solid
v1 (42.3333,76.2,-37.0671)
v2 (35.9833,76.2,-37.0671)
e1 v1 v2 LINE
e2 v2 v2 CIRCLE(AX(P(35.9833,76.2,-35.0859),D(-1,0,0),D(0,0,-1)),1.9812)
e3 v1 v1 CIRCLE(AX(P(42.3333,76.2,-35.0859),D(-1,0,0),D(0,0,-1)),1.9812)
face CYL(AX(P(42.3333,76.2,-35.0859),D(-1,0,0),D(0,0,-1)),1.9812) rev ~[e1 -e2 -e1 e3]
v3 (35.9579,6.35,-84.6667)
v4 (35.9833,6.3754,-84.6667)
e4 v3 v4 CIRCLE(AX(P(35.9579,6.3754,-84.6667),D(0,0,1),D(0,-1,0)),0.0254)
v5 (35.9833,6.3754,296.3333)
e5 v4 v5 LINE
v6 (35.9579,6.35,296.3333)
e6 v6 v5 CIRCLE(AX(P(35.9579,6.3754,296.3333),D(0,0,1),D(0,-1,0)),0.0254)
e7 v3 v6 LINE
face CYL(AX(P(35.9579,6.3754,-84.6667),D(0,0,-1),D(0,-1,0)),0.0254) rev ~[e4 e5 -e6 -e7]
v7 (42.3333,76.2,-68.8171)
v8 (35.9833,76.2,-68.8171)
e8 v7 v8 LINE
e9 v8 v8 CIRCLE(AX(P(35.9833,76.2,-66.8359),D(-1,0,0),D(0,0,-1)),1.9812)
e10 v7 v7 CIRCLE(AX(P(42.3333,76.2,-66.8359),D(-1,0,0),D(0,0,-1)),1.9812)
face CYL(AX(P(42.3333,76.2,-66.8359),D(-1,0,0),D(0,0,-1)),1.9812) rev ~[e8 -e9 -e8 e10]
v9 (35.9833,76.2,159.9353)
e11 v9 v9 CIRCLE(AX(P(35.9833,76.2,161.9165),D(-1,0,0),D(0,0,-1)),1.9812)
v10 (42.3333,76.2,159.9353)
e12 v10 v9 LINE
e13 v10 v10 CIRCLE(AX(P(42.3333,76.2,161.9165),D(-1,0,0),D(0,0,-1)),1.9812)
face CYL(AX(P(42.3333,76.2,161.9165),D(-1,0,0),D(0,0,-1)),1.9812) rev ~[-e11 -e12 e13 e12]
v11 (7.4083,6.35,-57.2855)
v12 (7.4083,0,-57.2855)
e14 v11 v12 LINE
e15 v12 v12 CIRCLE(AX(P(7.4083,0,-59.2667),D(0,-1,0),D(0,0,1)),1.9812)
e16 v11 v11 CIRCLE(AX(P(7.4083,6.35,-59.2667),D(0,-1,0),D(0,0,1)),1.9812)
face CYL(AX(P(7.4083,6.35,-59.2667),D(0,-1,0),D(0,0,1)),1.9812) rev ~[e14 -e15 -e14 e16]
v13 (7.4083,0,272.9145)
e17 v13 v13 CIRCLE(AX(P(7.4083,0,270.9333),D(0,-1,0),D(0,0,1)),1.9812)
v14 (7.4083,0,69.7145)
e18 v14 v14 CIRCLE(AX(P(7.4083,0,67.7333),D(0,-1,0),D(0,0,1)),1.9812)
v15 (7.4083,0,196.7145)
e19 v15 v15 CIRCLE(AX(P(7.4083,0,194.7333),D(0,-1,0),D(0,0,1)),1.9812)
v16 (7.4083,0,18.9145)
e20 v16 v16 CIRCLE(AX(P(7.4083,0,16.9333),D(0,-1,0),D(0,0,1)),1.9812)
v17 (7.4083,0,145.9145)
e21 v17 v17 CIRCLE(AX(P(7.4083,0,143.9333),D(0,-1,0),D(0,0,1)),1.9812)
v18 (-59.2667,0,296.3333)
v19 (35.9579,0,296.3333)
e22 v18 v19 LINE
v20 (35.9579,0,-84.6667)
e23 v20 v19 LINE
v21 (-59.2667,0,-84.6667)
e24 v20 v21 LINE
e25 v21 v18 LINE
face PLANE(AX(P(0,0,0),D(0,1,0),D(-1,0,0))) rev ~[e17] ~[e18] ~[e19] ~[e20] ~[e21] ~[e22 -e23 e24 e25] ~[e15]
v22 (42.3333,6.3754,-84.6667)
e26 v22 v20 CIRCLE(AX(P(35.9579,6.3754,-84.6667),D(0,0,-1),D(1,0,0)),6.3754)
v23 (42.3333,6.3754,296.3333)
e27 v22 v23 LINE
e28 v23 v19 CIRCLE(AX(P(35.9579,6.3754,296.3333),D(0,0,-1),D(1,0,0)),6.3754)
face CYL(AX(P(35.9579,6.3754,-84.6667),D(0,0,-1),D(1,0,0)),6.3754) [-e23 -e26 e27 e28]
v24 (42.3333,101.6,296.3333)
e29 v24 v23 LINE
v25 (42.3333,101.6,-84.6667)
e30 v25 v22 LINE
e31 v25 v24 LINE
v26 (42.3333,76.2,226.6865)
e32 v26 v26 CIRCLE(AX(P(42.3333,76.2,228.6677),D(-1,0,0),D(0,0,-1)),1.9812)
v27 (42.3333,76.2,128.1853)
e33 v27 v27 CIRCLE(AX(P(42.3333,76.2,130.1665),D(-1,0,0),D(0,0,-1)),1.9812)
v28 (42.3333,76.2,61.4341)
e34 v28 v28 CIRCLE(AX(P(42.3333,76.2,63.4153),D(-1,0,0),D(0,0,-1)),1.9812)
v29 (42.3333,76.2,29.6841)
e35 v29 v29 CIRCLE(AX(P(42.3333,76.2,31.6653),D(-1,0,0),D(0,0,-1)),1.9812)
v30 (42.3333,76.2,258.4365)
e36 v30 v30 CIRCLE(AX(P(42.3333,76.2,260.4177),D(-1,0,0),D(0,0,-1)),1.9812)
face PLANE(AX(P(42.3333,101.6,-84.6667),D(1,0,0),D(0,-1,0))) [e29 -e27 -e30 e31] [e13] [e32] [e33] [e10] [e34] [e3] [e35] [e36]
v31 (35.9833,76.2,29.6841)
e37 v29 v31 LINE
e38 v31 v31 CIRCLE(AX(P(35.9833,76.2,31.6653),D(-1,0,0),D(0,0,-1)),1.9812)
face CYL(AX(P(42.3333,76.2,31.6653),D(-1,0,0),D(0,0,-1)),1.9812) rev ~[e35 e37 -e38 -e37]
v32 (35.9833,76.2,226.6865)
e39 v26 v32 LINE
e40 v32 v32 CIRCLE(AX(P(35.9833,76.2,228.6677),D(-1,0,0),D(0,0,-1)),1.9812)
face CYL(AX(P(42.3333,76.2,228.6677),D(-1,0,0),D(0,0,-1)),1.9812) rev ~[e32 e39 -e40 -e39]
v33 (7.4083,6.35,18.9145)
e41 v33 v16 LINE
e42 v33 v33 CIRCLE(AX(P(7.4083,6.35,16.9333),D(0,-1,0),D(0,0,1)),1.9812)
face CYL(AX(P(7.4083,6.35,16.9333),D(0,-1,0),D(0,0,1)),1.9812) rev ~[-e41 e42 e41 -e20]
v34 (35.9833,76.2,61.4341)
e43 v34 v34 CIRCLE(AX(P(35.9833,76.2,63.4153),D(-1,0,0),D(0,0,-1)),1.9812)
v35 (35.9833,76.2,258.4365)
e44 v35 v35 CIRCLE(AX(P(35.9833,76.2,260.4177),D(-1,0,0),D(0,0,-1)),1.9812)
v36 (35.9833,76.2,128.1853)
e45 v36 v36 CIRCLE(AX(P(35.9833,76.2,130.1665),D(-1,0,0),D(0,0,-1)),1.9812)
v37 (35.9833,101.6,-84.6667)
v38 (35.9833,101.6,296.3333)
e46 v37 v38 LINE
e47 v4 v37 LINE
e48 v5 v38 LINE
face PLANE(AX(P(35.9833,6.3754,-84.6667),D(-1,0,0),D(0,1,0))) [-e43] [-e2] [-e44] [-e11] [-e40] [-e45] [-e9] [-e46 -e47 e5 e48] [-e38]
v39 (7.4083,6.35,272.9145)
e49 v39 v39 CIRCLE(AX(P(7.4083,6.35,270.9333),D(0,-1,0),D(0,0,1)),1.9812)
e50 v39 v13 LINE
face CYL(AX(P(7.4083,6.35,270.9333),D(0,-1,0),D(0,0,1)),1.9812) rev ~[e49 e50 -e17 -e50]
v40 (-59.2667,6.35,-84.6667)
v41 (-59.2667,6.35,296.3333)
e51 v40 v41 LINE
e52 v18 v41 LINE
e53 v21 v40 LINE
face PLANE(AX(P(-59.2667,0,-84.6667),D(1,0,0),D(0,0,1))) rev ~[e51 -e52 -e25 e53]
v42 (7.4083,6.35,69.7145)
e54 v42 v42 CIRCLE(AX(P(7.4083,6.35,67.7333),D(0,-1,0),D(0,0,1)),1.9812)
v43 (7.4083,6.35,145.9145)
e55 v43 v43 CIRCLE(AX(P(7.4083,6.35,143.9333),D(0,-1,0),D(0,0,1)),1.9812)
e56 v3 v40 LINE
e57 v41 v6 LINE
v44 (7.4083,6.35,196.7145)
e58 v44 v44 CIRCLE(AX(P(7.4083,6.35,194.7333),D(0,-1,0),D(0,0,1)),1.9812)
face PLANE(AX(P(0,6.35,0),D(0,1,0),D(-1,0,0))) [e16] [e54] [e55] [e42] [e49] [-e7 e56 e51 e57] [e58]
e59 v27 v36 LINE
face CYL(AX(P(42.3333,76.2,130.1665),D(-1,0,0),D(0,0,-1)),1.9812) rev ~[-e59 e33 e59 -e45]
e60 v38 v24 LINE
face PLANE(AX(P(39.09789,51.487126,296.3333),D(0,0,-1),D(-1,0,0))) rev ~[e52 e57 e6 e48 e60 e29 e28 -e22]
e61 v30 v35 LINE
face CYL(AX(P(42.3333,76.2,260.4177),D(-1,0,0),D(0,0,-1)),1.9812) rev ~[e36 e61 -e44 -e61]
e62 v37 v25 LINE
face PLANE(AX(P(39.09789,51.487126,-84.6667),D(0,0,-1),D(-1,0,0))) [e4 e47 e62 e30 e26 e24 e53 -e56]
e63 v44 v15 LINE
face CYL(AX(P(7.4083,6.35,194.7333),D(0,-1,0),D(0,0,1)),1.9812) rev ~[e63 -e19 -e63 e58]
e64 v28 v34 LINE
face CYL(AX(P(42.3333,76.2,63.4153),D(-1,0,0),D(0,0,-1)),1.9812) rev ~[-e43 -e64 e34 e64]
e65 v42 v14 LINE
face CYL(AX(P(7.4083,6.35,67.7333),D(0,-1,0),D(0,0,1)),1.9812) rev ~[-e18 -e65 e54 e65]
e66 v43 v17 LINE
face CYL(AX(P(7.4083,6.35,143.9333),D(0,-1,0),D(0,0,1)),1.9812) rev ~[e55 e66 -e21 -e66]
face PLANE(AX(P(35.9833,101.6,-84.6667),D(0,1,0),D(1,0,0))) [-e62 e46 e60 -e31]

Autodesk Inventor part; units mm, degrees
ref_plane "YZ Plane" through (0, 0, 0) normal (1, 0, 0) x (0, 1, 0)
ref_plane "XZ Plane" through (0, 0, 0) normal (0, 1, 0) x (-1, 0, 0)
ref_plane "XY Plane" through (0, 0, 0) normal (0, 0, 1) x (1, 0, 0)
sketch "Sketch1" plane through (0, 0, 0) normal (0, 1, 0) x (-1, 0, 0)
  line L0 (59.2667, 296.3333) -> (-42.3333, 296.3333)
  line L1 (-42.3333, 296.3333) -> (-42.3333, -84.6667)
  line L2 (-42.3333, -84.6667) -> (59.2667, -84.6667)
  line L3 (59.2667, -84.6667) -> (59.2667, 296.3333)
  point P0 (0, 0)
  dimension "d0" = 101.6
  dimension "d1" = 381
extrude "Plate1" add sketch "Sketch1" along normal blind 6.35
sketch "Sketch2" plane through (35.9833, 0, -84.6667) normal (1, 0, 0) x (0, 1, 0)
  line L0 (0, 381) -> (0, 0)
  line L1 (0, 0) -> (101.6, 0)
  line L2 (101.6, 0) -> (101.6, 381)
  line L3 (101.6, 381) -> (0, 381)
edge flange "Flange1" height 101.6 angle 90 thickness 6.35 bend radius 0.0254 thickness toward (1, 0, 0) relief straight relief width 6.35 relief depth 3.175 edges at (42.3333, 6.35, 105.8333) wall of the first edge with corners at (35.9833, 0, 296.3333) (35.9833, 0, -84.6667) (35.9833, 101.6, -84.6667) (35.9833, 101.6, 296.3333)
bend "Bend1"
corner "Corner1"
sketch "Sketch3" plane through (42.3333, 101.6, 296.3333) normal (1, 0, 0) x (0, 0, -1)
  line L0 (20.0406, 0) -> (378.4346, 0) construction
  line L1 (378.4346, 0) -> (378.4346, -101.6) construction
  line L2 (378.4346, -101.6) -> (20.0406, -101.6) construction
  line L3 (20.0406, -101.6) -> (20.0406, 0) construction
  line L4 (0, -95.2246) -> (0, 0) construction
  line L5 (0, 0) -> (381, 0) construction
  line L6 (20.0406, 0) -> (83.5406, 0) construction
  line L7 (83.5406, 0) -> (83.5406, -95.25) construction
  line L8 (83.5406, -95.25) -> (20.0406, -95.25) construction
  line L9 (20.0406, -95.25) -> (20.0406, 0) construction
  line L10 (118.3386, 0) -> (181.8386, 0) construction
  line L11 (181.8386, 0) -> (181.8386, -95.25) construction
  line L12 (181.8386, -95.25) -> (118.3386, -95.25) construction
  line L13 (118.3386, -95.25) -> (118.3386, 0) construction
  line L14 (216.6366, 0) -> (280.1366, 0) construction
  line L15 (280.1366, 0) -> (280.1366, -95.25) construction
  line L16 (280.1366, -95.25) -> (216.6366, -95.25) construction
  line L17 (216.6366, -95.25) -> (216.6366, 0) construction
  line L18 (314.9346, 0) -> (378.4346, 0) construction
  line L19 (378.4346, 0) -> (378.4346, -95.25) construction
  line L20 (378.4346, -95.25) -> (314.9346, -95.25) construction
  line L21 (314.9346, -95.25) -> (314.9346, 0) construction
  line L22 (35.9156, -25.4) -> (67.6656, -25.4) construction
  line L23 (134.4168, -25.4) -> (166.1668, -25.4) construction
  line L24 (232.918, -25.4) -> (264.668, -25.4) construction
  line L25 (331.4192, -25.4) -> (363.1692, -25.4) construction
  point P0 (296.3333, -101.6)
  dimension "d13" = 358.394
  dimension "d14" = 20.0406
  dimension "d15" = 101.6
  dimension "d16" = 0
  dimension "d17" = 63.5
  dimension "d18" = 63.5
  dimension "d19" = 34.798
  dimension "d20" = 63.5
  dimension "d21" = 34.798
  dimension "d22" = 63.5
  dimension "d23" = 34.798
  dimension "d24" = 25.4
  dimension "d25" = 31.75
  dimension "d26" = 15.875
  dimension "d36" = 98.5012
hole "Hole1" at (42.3333, 76.2, 260.4177) at (42.3333, 76.2, 228.6677) at (42.3333, 76.2, 130.1665) at (42.3333, 76.2, 161.9165) at (42.3333, 76.2, 63.4153) at (42.3333, 76.2, 31.6653) at (42.3333, 76.2, -35.0859) at (42.3333, 76.2, -66.8359) direction (-1, 0, 0) diameter 3.9624 depth 13.6144 tip angle 118 thread size "10-32 UNF" class "2B" standard "ANSI Unified Screw Threads"
sketch "Sketch4" plane through (0, 6.35, 0) normal (0, 1, 0) x (1, 0, 0)
  line L0 (-59.2667, -296.3333) -> (-59.2667, 84.6667) projected
  line L1 (-59.2667, 84.6667) -> (35.9579, 84.6667) projected
  line L2 (42.3333, -296.3333) -> (42.3333, 84.6667) projected
  line L3 (35.9579, -296.3333) -> (-59.2667, -296.3333) projected
  point P0 (7.4083, 59.2667)
  point P1 (7.4083, -16.9333)
  point P2 (7.4083, -67.7333)
  point P3 (7.4083, -143.9333)
  point P4 (7.4083, -194.7333)
  point P5 (7.4083, -270.9333)
  dimension "d42" = 25.4
  dimension "d45" = 76.2
  dimension "d58" = 34.925
  dimension "d59" = 34.925
  dimension "d60" = 50.8
  dimension "d61" = 76.2
  dimension "d62" = 50.8
  dimension "d63" = 76.2
  dimension "d64" = 25.4
  dimension "d65" = 34.925
  dimension "d66" = 34.925
  dimension "d67" = 34.925
hole "Hole2" at (7.4083, 6.35, -59.2667) at (7.4083, 6.35, 16.9333) at (7.4083, 6.35, 67.7333) at (7.4083, 6.35, 143.9333) at (7.4083, 6.35, 194.7333) at (7.4083, 6.35, 270.9333) direction (0, -1, 0) diameter 3.9624 depth 13.6144 tip angle 118 thread size "10-32 UNF" class "2B" standard "ANSI Unified Screw Threads"
equation "\"d3\" = BendReliefWidth"
equation "\"d4\" = BendReliefDepth"
equation "\"d5\" = MinimumRemnant"
equation "\"d6\" = BendRadius"
equation "\"d10\" = CornerReliefSize"
equation "\"d11\" = GapSize"
equation "\"d12\" = JacobiRadiusSize"
equation "\"BendRadius\" = Thickness"
equation "\"BendReliefWidth\" = Thickness"
equation "\"BendReliefDepth\" = 0.5 * Thickness"
equation "\"CornerReliefSize\" = 4 * Thickness"
equation "\"MinimumRemnant\" = 2 * Thickness"
equation "\"TransitionRadius\" = BendRadius"
equation "\"JacobiRadiusSize\" = Thickness"
equation "\"GapSize\" = Thickness"
equation "\"d2\" = BendRadius"
equation "\"Thickness\" = 6.35"
properties part number "ubracket"
